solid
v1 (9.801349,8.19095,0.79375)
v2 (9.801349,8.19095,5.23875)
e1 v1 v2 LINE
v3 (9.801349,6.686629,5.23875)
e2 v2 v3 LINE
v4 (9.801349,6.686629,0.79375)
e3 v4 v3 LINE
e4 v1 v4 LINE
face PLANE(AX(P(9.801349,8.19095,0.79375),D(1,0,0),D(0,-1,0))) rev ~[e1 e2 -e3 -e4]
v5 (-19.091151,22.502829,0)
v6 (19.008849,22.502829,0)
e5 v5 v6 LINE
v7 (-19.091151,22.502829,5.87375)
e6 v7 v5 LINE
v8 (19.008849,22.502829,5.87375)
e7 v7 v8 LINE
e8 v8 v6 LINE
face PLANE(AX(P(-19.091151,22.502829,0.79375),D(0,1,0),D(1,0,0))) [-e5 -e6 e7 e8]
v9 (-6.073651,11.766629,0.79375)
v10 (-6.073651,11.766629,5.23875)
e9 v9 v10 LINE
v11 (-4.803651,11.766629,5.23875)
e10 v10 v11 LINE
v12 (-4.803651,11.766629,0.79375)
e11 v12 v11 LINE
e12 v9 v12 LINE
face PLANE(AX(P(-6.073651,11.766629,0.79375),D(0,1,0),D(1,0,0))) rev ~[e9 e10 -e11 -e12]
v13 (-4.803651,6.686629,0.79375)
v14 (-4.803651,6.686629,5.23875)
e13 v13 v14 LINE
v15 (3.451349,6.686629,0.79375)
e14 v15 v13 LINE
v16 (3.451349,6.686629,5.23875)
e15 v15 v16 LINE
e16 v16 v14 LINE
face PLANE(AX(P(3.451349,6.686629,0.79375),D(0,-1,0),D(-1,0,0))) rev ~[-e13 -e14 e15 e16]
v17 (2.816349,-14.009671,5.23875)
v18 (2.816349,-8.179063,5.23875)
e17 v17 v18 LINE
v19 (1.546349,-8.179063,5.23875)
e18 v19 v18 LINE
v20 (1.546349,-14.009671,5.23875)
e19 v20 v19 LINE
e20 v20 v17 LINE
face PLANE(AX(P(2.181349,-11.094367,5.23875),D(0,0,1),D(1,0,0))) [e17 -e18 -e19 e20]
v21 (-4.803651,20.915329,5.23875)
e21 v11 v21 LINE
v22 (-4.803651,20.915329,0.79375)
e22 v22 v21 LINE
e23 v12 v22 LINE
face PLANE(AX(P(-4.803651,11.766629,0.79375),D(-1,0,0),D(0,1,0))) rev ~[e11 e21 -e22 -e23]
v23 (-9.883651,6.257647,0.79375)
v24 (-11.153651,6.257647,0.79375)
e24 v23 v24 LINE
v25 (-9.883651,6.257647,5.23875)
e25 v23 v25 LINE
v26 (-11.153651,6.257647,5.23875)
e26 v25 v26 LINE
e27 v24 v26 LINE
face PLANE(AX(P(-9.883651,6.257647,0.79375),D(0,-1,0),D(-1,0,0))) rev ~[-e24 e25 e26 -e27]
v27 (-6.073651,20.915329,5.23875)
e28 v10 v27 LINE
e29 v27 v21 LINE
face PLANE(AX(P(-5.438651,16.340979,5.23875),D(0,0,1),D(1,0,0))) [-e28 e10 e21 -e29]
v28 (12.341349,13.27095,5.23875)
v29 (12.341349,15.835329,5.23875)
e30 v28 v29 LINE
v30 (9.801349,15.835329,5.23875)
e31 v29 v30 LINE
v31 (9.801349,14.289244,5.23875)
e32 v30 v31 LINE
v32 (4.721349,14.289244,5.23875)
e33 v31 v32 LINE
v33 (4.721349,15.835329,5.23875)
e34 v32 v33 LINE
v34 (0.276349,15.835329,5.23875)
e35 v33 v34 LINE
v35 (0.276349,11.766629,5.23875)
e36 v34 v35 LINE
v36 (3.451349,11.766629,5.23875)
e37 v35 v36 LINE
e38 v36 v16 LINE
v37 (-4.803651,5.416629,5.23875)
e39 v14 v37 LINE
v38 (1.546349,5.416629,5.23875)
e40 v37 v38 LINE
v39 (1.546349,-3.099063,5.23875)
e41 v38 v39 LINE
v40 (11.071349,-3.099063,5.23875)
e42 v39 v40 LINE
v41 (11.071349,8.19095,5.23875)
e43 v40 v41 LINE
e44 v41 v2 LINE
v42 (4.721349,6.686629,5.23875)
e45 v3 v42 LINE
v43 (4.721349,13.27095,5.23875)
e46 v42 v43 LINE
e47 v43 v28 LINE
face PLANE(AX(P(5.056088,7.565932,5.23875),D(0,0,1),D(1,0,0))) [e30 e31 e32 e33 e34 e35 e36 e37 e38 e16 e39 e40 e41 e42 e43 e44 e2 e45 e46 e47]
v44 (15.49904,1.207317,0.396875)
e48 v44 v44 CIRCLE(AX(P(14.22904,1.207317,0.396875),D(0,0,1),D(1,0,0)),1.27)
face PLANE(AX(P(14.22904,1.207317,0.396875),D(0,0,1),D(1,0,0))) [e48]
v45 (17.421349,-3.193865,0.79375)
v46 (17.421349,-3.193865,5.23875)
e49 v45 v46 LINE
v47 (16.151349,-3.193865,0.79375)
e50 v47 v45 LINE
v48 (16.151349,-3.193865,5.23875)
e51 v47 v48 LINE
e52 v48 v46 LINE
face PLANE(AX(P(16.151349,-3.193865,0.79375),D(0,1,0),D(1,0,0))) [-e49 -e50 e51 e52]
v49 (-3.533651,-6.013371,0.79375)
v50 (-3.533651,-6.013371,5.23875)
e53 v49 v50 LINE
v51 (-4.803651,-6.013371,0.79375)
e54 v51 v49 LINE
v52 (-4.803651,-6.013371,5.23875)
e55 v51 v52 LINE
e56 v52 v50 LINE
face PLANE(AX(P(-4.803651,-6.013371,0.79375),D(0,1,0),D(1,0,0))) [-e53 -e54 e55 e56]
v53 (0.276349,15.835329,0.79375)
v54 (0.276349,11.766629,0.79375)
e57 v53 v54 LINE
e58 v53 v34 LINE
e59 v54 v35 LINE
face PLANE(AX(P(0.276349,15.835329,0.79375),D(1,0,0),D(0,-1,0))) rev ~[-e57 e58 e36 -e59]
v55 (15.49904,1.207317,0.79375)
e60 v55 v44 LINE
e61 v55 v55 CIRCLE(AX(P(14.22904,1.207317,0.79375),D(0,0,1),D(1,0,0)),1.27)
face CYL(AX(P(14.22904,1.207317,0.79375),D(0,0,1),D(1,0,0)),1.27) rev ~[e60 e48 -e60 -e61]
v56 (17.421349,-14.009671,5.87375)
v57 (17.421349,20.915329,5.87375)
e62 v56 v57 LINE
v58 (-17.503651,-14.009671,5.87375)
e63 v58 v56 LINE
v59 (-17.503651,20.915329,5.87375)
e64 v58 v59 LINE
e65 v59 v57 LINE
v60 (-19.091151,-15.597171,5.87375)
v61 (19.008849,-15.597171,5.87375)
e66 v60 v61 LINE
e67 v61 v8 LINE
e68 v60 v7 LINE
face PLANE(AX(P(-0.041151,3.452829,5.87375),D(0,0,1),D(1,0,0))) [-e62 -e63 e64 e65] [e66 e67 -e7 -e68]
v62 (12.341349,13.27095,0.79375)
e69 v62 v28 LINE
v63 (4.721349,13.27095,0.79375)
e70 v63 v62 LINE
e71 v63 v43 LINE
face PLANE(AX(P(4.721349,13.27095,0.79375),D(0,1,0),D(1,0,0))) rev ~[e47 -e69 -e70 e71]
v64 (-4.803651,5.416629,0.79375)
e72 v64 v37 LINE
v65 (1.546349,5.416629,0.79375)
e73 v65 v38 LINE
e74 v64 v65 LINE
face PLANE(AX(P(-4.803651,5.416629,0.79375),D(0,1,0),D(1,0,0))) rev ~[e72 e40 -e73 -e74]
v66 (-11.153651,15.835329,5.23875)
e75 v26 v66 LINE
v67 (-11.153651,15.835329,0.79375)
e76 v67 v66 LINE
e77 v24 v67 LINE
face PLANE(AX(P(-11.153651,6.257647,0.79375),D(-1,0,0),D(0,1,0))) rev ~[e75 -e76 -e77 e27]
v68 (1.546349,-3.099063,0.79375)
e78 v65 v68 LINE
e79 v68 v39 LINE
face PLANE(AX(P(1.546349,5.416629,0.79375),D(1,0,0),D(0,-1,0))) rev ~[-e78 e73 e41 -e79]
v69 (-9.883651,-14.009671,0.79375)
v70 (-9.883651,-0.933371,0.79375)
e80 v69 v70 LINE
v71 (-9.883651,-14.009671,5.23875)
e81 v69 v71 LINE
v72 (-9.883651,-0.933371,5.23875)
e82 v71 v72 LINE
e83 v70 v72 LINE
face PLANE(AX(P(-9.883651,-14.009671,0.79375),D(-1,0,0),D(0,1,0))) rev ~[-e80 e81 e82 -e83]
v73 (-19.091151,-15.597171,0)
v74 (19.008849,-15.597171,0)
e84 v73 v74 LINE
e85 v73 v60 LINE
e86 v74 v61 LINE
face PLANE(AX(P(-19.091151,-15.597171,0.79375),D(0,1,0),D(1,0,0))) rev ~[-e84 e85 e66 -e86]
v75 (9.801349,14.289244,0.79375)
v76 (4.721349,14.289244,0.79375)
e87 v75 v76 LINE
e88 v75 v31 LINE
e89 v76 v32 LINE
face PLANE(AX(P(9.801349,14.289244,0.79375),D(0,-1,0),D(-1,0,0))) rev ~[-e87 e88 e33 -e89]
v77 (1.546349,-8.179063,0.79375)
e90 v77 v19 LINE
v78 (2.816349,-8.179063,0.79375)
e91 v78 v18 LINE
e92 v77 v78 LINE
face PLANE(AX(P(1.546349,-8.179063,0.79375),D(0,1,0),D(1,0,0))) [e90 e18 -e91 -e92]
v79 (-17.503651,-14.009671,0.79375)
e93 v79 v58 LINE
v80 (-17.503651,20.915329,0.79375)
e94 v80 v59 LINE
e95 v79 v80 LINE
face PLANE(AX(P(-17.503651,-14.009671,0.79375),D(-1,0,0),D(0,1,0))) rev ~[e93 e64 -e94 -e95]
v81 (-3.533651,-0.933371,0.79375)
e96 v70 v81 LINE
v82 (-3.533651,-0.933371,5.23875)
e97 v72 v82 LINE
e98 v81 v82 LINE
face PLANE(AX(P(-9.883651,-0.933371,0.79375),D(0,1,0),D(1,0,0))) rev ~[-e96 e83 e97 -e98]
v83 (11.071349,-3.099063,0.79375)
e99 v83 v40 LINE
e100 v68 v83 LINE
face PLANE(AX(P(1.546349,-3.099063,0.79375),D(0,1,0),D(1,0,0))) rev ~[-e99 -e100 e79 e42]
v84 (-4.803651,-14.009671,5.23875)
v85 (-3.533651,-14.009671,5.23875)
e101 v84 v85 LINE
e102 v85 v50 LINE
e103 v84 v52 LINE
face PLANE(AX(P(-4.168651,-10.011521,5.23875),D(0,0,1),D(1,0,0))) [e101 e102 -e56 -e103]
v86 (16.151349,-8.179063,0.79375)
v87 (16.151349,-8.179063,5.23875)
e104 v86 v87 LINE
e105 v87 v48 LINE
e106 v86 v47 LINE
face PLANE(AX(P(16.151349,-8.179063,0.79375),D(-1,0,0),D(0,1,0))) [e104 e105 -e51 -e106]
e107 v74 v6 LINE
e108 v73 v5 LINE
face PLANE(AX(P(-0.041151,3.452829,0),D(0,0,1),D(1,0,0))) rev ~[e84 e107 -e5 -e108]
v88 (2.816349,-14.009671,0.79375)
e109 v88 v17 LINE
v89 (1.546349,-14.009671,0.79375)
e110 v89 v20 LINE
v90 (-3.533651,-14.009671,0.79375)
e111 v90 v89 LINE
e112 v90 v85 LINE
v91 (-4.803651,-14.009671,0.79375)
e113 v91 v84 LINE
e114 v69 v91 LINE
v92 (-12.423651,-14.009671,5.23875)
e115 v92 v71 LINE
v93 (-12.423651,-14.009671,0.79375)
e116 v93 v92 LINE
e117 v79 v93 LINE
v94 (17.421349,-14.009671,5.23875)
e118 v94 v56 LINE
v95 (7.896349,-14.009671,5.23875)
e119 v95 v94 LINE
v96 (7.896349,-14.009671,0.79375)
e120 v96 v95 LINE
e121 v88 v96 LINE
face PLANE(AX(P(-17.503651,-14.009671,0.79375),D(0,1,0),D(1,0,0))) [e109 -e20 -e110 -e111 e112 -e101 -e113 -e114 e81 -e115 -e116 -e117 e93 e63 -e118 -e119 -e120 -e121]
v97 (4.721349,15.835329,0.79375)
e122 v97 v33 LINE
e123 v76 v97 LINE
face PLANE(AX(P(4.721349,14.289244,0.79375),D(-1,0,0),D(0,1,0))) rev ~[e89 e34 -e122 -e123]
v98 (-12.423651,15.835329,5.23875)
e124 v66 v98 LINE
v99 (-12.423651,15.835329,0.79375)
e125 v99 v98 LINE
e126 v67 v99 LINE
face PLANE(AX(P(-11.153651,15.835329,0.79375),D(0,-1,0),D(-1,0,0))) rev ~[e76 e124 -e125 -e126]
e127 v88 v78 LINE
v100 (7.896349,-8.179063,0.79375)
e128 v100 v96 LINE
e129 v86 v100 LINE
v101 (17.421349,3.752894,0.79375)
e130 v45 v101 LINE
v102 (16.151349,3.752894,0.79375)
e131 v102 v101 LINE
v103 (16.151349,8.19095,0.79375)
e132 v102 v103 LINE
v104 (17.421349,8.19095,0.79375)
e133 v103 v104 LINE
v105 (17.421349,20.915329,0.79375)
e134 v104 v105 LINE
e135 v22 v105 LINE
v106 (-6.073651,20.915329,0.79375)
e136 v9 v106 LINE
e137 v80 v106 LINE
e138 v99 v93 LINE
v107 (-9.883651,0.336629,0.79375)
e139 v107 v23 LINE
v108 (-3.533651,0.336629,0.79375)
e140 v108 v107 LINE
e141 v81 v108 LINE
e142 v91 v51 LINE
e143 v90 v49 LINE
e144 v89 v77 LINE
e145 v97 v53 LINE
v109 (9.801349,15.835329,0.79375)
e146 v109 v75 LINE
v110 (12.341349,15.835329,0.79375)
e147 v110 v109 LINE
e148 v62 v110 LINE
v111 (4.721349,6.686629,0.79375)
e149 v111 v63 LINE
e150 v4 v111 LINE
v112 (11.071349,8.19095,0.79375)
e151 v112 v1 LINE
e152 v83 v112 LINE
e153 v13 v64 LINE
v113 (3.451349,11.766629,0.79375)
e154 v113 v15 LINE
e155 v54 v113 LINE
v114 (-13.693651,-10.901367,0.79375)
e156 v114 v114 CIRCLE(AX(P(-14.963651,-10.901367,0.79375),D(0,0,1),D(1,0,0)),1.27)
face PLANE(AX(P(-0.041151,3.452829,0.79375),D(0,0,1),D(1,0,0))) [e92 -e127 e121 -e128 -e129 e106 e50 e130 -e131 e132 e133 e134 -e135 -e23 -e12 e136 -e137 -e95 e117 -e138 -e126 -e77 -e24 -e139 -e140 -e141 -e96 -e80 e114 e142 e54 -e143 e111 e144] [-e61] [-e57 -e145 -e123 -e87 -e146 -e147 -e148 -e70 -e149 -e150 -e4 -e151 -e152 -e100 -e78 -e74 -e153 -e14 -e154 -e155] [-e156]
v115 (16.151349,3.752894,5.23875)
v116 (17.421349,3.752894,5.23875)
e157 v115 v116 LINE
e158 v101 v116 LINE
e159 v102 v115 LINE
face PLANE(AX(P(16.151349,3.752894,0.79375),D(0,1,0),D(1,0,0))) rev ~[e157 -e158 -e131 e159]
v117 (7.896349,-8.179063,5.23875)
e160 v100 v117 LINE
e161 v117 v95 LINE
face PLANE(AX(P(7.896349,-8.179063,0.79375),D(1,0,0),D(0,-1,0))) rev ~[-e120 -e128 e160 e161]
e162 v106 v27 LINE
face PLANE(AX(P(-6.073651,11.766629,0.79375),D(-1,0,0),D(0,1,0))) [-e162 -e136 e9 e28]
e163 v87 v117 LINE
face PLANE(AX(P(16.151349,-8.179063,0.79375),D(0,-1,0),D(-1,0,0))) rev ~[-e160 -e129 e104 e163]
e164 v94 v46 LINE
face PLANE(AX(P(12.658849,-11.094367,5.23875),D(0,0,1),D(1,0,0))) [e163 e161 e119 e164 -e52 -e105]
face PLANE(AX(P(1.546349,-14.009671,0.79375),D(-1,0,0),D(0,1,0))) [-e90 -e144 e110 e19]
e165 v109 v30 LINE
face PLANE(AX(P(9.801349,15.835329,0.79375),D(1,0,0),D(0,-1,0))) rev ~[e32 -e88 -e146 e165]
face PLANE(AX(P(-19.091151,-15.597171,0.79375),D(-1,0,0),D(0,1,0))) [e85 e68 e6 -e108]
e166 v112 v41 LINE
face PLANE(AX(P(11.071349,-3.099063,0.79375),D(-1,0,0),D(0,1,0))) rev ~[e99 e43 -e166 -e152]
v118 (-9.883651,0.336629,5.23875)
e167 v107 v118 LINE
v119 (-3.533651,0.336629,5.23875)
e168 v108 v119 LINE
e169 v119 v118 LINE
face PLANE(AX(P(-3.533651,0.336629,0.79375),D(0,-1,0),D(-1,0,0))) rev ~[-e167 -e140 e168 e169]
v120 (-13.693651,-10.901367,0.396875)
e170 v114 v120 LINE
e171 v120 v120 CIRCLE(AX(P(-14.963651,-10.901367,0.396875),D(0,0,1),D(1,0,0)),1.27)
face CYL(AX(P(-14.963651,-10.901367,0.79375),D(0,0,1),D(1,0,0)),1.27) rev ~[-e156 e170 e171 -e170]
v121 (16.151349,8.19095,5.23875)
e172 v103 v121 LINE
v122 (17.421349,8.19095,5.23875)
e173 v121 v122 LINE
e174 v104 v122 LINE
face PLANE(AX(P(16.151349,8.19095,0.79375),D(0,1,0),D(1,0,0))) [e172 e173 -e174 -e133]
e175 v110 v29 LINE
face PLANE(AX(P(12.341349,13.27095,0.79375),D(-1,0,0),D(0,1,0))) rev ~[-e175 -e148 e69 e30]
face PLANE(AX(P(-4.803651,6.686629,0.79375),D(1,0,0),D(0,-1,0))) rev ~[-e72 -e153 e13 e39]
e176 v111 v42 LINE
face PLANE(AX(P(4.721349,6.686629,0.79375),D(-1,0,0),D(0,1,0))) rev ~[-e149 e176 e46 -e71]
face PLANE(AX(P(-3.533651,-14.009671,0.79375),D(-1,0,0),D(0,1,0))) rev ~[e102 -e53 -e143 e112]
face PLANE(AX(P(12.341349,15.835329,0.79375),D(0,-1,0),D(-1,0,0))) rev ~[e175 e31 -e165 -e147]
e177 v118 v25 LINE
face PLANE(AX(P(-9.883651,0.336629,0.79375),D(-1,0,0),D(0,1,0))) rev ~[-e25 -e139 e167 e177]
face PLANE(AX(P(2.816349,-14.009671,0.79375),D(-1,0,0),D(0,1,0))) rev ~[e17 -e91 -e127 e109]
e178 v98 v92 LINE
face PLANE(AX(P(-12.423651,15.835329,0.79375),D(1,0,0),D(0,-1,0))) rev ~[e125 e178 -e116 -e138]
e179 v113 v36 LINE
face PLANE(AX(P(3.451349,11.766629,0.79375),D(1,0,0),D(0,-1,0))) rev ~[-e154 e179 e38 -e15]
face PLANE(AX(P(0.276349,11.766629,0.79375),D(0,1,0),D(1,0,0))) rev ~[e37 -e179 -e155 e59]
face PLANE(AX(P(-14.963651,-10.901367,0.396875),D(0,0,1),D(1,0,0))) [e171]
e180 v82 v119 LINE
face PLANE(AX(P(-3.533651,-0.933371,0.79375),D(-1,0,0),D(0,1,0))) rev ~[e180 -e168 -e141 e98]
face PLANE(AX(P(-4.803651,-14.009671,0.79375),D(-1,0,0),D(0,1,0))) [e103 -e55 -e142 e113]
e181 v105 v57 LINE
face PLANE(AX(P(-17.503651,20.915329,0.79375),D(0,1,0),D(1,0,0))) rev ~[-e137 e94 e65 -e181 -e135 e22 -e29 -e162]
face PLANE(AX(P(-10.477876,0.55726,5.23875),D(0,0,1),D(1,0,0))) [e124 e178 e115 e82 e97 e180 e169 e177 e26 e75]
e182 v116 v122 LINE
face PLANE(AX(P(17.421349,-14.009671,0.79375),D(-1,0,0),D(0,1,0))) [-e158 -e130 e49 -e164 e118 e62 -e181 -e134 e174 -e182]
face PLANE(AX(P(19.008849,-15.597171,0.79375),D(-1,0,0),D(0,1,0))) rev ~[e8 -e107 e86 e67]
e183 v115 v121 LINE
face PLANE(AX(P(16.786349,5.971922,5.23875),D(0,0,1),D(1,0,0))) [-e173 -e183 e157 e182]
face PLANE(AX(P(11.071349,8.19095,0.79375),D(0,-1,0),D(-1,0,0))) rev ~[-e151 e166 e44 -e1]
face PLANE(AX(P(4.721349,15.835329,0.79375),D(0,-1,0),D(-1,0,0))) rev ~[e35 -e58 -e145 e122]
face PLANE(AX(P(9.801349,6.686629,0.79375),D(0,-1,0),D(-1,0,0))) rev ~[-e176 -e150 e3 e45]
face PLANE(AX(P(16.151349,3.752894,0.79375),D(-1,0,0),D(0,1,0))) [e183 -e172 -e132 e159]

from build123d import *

# Parameters (mm, degrees)
F0_W     = 38.1
F0_H     = 38.1
F1_DEPTH = 0.79375
F2_W     = 38.1
F2_H     = 38.1
F2_W_2   = 34.925
F2_H_2   = 34.925
F3_DEPTH = 5.08
F4_W     = 1.27
F4_H     = 4.4380559438
F5_DEPTH = 4.445
F4_H_2   = 7.9962998058
F4_H_3   = 5.8306083127
F4_H_4   = 4.9851979129
F4_H_5   = 9.1487001942
F6_DEPTH = 4.445
F4_R     = 1.27
F7_DEPTH = 0.396875
F8_DEPTH = 0.396875


# Not quite as in the source:
# - a feature names something its author has since deleted; it is built from what else it names


with BuildPart() as f1:
    # F0 (on Top) → F1 (new body)
    with BuildSketch(Plane.XY):
        with Locations((-0.0411514193, 3.4528287099)):
            Rectangle(F0_W, F0_H)
    extrude(amount=F1_DEPTH)

    # F2 (on face) → F3 (join)
    with BuildSketch(Plane.XY.offset(0.79375)):
        with Locations((-0.0411514193, 3.4528287099)):
            Rectangle(F2_W, F2_H)
        with Locations((-0.0411514193, 3.4528287099)):
            Rectangle(F2_W_2, F2_H_2, mode=Mode.SUBTRACT)
    extrude(amount=F3_DEPTH)

    # F4 (on face) → F5 (join)
    with BuildSketch(Plane.XY.offset(0.79375)):
        Polygon((3.4513485807, 6.6866285157), (-4.8036514193, 6.6866285157), (-4.8036514193, 5.4166285157), (1.5463485807, 5.4166285157), (1.5463485807, -3.0990629774), (11.0713485807, -3.0990629774), (11.0713485807, 5.1481691189), (11.0713485807, 5.4166285157), (11.0713485807, 8.1909499449), (9.8013485807, 8.1909499449), (9.8013485807, 6.6866285157), (4.7213485807, 6.6866285157), (4.7213485807, 13.2709499449), (12.3413485807, 13.2709499449), (12.3413485807, 14.2892440781), (12.3413485807, 15.8353287099), (9.8013485807, 15.8353287099), (9.8013485807, 14.2892440781), (4.7213485807, 14.2892440781), (4.7213485807, 15.8353287099), (3.4513485807, 15.8353287099), (1.5463485807, 15.8353287099), (0.2763485807, 15.8353287099), (0.2763485807, 11.7666285157), (1.5463485807, 11.7666285157), (3.4513485807, 11.7666285157), align=None)
        with Locations((16.7863485807, 5.971921973)):
            Rectangle(F4_W, F4_H)
    extrude(amount=F5_DEPTH)

    # F4 (on face) → F6 (join)
    with BuildSketch(Plane.XY.offset(0.79375)):
        Polygon((-11.1536514193, 15.8353287099), (-12.4236514193, 15.8353287099), (-12.4236514193, -14.0096712901), (-9.8836514193, -14.0096712901), (-9.8836514193, -0.9333714843), (-3.5336514193, -0.9333714843), (-3.5336514193, 0.3366285157), (-9.8836514193, 0.3366285157), (-9.8836514193, 6.2576471828), (-11.1536514193, 6.2576471828), align=None)
        with Locations((-4.1686514193, -10.0115213872)):
            Rectangle(F4_W, F4_H_2)
        with Locations((2.1813485807, -11.0943671338)):
            Rectangle(F4_W, F4_H_3)
        Polygon((7.8963485807, -8.1790629774), (7.8963485807, -14.0096712901), (17.4213485807, -14.0096712901), (17.4213485807, -8.1790629774), (16.1513485807, -8.1790629774), align=None)
        with Locations((16.7863485807, -5.686464021)):
            Rectangle(F4_W, F4_H_4)
        with Locations((-5.4386514193, 16.3409786128)):
            Rectangle(F4_W, F4_H_5)
    extrude(amount=F6_DEPTH)

    # F4 (on face) → F7 (cut)
    with BuildSketch(Plane.XY.offset(0.79375)):
        with Locations((-14.9636514193, -10.9013672918)):
            Circle(F4_R)
    extrude(amount=-F7_DEPTH, mode=Mode.SUBTRACT)

    # F4 (on face) → F8 (cut)
    with BuildSketch(Plane.XY.offset(0.79375)):
        with Locations((14.2290396616, 1.2073169928)):
            Circle(F4_R)
    extrude(amount=-F8_DEPTH, mode=Mode.SUBTRACT)


solid = f1.part
